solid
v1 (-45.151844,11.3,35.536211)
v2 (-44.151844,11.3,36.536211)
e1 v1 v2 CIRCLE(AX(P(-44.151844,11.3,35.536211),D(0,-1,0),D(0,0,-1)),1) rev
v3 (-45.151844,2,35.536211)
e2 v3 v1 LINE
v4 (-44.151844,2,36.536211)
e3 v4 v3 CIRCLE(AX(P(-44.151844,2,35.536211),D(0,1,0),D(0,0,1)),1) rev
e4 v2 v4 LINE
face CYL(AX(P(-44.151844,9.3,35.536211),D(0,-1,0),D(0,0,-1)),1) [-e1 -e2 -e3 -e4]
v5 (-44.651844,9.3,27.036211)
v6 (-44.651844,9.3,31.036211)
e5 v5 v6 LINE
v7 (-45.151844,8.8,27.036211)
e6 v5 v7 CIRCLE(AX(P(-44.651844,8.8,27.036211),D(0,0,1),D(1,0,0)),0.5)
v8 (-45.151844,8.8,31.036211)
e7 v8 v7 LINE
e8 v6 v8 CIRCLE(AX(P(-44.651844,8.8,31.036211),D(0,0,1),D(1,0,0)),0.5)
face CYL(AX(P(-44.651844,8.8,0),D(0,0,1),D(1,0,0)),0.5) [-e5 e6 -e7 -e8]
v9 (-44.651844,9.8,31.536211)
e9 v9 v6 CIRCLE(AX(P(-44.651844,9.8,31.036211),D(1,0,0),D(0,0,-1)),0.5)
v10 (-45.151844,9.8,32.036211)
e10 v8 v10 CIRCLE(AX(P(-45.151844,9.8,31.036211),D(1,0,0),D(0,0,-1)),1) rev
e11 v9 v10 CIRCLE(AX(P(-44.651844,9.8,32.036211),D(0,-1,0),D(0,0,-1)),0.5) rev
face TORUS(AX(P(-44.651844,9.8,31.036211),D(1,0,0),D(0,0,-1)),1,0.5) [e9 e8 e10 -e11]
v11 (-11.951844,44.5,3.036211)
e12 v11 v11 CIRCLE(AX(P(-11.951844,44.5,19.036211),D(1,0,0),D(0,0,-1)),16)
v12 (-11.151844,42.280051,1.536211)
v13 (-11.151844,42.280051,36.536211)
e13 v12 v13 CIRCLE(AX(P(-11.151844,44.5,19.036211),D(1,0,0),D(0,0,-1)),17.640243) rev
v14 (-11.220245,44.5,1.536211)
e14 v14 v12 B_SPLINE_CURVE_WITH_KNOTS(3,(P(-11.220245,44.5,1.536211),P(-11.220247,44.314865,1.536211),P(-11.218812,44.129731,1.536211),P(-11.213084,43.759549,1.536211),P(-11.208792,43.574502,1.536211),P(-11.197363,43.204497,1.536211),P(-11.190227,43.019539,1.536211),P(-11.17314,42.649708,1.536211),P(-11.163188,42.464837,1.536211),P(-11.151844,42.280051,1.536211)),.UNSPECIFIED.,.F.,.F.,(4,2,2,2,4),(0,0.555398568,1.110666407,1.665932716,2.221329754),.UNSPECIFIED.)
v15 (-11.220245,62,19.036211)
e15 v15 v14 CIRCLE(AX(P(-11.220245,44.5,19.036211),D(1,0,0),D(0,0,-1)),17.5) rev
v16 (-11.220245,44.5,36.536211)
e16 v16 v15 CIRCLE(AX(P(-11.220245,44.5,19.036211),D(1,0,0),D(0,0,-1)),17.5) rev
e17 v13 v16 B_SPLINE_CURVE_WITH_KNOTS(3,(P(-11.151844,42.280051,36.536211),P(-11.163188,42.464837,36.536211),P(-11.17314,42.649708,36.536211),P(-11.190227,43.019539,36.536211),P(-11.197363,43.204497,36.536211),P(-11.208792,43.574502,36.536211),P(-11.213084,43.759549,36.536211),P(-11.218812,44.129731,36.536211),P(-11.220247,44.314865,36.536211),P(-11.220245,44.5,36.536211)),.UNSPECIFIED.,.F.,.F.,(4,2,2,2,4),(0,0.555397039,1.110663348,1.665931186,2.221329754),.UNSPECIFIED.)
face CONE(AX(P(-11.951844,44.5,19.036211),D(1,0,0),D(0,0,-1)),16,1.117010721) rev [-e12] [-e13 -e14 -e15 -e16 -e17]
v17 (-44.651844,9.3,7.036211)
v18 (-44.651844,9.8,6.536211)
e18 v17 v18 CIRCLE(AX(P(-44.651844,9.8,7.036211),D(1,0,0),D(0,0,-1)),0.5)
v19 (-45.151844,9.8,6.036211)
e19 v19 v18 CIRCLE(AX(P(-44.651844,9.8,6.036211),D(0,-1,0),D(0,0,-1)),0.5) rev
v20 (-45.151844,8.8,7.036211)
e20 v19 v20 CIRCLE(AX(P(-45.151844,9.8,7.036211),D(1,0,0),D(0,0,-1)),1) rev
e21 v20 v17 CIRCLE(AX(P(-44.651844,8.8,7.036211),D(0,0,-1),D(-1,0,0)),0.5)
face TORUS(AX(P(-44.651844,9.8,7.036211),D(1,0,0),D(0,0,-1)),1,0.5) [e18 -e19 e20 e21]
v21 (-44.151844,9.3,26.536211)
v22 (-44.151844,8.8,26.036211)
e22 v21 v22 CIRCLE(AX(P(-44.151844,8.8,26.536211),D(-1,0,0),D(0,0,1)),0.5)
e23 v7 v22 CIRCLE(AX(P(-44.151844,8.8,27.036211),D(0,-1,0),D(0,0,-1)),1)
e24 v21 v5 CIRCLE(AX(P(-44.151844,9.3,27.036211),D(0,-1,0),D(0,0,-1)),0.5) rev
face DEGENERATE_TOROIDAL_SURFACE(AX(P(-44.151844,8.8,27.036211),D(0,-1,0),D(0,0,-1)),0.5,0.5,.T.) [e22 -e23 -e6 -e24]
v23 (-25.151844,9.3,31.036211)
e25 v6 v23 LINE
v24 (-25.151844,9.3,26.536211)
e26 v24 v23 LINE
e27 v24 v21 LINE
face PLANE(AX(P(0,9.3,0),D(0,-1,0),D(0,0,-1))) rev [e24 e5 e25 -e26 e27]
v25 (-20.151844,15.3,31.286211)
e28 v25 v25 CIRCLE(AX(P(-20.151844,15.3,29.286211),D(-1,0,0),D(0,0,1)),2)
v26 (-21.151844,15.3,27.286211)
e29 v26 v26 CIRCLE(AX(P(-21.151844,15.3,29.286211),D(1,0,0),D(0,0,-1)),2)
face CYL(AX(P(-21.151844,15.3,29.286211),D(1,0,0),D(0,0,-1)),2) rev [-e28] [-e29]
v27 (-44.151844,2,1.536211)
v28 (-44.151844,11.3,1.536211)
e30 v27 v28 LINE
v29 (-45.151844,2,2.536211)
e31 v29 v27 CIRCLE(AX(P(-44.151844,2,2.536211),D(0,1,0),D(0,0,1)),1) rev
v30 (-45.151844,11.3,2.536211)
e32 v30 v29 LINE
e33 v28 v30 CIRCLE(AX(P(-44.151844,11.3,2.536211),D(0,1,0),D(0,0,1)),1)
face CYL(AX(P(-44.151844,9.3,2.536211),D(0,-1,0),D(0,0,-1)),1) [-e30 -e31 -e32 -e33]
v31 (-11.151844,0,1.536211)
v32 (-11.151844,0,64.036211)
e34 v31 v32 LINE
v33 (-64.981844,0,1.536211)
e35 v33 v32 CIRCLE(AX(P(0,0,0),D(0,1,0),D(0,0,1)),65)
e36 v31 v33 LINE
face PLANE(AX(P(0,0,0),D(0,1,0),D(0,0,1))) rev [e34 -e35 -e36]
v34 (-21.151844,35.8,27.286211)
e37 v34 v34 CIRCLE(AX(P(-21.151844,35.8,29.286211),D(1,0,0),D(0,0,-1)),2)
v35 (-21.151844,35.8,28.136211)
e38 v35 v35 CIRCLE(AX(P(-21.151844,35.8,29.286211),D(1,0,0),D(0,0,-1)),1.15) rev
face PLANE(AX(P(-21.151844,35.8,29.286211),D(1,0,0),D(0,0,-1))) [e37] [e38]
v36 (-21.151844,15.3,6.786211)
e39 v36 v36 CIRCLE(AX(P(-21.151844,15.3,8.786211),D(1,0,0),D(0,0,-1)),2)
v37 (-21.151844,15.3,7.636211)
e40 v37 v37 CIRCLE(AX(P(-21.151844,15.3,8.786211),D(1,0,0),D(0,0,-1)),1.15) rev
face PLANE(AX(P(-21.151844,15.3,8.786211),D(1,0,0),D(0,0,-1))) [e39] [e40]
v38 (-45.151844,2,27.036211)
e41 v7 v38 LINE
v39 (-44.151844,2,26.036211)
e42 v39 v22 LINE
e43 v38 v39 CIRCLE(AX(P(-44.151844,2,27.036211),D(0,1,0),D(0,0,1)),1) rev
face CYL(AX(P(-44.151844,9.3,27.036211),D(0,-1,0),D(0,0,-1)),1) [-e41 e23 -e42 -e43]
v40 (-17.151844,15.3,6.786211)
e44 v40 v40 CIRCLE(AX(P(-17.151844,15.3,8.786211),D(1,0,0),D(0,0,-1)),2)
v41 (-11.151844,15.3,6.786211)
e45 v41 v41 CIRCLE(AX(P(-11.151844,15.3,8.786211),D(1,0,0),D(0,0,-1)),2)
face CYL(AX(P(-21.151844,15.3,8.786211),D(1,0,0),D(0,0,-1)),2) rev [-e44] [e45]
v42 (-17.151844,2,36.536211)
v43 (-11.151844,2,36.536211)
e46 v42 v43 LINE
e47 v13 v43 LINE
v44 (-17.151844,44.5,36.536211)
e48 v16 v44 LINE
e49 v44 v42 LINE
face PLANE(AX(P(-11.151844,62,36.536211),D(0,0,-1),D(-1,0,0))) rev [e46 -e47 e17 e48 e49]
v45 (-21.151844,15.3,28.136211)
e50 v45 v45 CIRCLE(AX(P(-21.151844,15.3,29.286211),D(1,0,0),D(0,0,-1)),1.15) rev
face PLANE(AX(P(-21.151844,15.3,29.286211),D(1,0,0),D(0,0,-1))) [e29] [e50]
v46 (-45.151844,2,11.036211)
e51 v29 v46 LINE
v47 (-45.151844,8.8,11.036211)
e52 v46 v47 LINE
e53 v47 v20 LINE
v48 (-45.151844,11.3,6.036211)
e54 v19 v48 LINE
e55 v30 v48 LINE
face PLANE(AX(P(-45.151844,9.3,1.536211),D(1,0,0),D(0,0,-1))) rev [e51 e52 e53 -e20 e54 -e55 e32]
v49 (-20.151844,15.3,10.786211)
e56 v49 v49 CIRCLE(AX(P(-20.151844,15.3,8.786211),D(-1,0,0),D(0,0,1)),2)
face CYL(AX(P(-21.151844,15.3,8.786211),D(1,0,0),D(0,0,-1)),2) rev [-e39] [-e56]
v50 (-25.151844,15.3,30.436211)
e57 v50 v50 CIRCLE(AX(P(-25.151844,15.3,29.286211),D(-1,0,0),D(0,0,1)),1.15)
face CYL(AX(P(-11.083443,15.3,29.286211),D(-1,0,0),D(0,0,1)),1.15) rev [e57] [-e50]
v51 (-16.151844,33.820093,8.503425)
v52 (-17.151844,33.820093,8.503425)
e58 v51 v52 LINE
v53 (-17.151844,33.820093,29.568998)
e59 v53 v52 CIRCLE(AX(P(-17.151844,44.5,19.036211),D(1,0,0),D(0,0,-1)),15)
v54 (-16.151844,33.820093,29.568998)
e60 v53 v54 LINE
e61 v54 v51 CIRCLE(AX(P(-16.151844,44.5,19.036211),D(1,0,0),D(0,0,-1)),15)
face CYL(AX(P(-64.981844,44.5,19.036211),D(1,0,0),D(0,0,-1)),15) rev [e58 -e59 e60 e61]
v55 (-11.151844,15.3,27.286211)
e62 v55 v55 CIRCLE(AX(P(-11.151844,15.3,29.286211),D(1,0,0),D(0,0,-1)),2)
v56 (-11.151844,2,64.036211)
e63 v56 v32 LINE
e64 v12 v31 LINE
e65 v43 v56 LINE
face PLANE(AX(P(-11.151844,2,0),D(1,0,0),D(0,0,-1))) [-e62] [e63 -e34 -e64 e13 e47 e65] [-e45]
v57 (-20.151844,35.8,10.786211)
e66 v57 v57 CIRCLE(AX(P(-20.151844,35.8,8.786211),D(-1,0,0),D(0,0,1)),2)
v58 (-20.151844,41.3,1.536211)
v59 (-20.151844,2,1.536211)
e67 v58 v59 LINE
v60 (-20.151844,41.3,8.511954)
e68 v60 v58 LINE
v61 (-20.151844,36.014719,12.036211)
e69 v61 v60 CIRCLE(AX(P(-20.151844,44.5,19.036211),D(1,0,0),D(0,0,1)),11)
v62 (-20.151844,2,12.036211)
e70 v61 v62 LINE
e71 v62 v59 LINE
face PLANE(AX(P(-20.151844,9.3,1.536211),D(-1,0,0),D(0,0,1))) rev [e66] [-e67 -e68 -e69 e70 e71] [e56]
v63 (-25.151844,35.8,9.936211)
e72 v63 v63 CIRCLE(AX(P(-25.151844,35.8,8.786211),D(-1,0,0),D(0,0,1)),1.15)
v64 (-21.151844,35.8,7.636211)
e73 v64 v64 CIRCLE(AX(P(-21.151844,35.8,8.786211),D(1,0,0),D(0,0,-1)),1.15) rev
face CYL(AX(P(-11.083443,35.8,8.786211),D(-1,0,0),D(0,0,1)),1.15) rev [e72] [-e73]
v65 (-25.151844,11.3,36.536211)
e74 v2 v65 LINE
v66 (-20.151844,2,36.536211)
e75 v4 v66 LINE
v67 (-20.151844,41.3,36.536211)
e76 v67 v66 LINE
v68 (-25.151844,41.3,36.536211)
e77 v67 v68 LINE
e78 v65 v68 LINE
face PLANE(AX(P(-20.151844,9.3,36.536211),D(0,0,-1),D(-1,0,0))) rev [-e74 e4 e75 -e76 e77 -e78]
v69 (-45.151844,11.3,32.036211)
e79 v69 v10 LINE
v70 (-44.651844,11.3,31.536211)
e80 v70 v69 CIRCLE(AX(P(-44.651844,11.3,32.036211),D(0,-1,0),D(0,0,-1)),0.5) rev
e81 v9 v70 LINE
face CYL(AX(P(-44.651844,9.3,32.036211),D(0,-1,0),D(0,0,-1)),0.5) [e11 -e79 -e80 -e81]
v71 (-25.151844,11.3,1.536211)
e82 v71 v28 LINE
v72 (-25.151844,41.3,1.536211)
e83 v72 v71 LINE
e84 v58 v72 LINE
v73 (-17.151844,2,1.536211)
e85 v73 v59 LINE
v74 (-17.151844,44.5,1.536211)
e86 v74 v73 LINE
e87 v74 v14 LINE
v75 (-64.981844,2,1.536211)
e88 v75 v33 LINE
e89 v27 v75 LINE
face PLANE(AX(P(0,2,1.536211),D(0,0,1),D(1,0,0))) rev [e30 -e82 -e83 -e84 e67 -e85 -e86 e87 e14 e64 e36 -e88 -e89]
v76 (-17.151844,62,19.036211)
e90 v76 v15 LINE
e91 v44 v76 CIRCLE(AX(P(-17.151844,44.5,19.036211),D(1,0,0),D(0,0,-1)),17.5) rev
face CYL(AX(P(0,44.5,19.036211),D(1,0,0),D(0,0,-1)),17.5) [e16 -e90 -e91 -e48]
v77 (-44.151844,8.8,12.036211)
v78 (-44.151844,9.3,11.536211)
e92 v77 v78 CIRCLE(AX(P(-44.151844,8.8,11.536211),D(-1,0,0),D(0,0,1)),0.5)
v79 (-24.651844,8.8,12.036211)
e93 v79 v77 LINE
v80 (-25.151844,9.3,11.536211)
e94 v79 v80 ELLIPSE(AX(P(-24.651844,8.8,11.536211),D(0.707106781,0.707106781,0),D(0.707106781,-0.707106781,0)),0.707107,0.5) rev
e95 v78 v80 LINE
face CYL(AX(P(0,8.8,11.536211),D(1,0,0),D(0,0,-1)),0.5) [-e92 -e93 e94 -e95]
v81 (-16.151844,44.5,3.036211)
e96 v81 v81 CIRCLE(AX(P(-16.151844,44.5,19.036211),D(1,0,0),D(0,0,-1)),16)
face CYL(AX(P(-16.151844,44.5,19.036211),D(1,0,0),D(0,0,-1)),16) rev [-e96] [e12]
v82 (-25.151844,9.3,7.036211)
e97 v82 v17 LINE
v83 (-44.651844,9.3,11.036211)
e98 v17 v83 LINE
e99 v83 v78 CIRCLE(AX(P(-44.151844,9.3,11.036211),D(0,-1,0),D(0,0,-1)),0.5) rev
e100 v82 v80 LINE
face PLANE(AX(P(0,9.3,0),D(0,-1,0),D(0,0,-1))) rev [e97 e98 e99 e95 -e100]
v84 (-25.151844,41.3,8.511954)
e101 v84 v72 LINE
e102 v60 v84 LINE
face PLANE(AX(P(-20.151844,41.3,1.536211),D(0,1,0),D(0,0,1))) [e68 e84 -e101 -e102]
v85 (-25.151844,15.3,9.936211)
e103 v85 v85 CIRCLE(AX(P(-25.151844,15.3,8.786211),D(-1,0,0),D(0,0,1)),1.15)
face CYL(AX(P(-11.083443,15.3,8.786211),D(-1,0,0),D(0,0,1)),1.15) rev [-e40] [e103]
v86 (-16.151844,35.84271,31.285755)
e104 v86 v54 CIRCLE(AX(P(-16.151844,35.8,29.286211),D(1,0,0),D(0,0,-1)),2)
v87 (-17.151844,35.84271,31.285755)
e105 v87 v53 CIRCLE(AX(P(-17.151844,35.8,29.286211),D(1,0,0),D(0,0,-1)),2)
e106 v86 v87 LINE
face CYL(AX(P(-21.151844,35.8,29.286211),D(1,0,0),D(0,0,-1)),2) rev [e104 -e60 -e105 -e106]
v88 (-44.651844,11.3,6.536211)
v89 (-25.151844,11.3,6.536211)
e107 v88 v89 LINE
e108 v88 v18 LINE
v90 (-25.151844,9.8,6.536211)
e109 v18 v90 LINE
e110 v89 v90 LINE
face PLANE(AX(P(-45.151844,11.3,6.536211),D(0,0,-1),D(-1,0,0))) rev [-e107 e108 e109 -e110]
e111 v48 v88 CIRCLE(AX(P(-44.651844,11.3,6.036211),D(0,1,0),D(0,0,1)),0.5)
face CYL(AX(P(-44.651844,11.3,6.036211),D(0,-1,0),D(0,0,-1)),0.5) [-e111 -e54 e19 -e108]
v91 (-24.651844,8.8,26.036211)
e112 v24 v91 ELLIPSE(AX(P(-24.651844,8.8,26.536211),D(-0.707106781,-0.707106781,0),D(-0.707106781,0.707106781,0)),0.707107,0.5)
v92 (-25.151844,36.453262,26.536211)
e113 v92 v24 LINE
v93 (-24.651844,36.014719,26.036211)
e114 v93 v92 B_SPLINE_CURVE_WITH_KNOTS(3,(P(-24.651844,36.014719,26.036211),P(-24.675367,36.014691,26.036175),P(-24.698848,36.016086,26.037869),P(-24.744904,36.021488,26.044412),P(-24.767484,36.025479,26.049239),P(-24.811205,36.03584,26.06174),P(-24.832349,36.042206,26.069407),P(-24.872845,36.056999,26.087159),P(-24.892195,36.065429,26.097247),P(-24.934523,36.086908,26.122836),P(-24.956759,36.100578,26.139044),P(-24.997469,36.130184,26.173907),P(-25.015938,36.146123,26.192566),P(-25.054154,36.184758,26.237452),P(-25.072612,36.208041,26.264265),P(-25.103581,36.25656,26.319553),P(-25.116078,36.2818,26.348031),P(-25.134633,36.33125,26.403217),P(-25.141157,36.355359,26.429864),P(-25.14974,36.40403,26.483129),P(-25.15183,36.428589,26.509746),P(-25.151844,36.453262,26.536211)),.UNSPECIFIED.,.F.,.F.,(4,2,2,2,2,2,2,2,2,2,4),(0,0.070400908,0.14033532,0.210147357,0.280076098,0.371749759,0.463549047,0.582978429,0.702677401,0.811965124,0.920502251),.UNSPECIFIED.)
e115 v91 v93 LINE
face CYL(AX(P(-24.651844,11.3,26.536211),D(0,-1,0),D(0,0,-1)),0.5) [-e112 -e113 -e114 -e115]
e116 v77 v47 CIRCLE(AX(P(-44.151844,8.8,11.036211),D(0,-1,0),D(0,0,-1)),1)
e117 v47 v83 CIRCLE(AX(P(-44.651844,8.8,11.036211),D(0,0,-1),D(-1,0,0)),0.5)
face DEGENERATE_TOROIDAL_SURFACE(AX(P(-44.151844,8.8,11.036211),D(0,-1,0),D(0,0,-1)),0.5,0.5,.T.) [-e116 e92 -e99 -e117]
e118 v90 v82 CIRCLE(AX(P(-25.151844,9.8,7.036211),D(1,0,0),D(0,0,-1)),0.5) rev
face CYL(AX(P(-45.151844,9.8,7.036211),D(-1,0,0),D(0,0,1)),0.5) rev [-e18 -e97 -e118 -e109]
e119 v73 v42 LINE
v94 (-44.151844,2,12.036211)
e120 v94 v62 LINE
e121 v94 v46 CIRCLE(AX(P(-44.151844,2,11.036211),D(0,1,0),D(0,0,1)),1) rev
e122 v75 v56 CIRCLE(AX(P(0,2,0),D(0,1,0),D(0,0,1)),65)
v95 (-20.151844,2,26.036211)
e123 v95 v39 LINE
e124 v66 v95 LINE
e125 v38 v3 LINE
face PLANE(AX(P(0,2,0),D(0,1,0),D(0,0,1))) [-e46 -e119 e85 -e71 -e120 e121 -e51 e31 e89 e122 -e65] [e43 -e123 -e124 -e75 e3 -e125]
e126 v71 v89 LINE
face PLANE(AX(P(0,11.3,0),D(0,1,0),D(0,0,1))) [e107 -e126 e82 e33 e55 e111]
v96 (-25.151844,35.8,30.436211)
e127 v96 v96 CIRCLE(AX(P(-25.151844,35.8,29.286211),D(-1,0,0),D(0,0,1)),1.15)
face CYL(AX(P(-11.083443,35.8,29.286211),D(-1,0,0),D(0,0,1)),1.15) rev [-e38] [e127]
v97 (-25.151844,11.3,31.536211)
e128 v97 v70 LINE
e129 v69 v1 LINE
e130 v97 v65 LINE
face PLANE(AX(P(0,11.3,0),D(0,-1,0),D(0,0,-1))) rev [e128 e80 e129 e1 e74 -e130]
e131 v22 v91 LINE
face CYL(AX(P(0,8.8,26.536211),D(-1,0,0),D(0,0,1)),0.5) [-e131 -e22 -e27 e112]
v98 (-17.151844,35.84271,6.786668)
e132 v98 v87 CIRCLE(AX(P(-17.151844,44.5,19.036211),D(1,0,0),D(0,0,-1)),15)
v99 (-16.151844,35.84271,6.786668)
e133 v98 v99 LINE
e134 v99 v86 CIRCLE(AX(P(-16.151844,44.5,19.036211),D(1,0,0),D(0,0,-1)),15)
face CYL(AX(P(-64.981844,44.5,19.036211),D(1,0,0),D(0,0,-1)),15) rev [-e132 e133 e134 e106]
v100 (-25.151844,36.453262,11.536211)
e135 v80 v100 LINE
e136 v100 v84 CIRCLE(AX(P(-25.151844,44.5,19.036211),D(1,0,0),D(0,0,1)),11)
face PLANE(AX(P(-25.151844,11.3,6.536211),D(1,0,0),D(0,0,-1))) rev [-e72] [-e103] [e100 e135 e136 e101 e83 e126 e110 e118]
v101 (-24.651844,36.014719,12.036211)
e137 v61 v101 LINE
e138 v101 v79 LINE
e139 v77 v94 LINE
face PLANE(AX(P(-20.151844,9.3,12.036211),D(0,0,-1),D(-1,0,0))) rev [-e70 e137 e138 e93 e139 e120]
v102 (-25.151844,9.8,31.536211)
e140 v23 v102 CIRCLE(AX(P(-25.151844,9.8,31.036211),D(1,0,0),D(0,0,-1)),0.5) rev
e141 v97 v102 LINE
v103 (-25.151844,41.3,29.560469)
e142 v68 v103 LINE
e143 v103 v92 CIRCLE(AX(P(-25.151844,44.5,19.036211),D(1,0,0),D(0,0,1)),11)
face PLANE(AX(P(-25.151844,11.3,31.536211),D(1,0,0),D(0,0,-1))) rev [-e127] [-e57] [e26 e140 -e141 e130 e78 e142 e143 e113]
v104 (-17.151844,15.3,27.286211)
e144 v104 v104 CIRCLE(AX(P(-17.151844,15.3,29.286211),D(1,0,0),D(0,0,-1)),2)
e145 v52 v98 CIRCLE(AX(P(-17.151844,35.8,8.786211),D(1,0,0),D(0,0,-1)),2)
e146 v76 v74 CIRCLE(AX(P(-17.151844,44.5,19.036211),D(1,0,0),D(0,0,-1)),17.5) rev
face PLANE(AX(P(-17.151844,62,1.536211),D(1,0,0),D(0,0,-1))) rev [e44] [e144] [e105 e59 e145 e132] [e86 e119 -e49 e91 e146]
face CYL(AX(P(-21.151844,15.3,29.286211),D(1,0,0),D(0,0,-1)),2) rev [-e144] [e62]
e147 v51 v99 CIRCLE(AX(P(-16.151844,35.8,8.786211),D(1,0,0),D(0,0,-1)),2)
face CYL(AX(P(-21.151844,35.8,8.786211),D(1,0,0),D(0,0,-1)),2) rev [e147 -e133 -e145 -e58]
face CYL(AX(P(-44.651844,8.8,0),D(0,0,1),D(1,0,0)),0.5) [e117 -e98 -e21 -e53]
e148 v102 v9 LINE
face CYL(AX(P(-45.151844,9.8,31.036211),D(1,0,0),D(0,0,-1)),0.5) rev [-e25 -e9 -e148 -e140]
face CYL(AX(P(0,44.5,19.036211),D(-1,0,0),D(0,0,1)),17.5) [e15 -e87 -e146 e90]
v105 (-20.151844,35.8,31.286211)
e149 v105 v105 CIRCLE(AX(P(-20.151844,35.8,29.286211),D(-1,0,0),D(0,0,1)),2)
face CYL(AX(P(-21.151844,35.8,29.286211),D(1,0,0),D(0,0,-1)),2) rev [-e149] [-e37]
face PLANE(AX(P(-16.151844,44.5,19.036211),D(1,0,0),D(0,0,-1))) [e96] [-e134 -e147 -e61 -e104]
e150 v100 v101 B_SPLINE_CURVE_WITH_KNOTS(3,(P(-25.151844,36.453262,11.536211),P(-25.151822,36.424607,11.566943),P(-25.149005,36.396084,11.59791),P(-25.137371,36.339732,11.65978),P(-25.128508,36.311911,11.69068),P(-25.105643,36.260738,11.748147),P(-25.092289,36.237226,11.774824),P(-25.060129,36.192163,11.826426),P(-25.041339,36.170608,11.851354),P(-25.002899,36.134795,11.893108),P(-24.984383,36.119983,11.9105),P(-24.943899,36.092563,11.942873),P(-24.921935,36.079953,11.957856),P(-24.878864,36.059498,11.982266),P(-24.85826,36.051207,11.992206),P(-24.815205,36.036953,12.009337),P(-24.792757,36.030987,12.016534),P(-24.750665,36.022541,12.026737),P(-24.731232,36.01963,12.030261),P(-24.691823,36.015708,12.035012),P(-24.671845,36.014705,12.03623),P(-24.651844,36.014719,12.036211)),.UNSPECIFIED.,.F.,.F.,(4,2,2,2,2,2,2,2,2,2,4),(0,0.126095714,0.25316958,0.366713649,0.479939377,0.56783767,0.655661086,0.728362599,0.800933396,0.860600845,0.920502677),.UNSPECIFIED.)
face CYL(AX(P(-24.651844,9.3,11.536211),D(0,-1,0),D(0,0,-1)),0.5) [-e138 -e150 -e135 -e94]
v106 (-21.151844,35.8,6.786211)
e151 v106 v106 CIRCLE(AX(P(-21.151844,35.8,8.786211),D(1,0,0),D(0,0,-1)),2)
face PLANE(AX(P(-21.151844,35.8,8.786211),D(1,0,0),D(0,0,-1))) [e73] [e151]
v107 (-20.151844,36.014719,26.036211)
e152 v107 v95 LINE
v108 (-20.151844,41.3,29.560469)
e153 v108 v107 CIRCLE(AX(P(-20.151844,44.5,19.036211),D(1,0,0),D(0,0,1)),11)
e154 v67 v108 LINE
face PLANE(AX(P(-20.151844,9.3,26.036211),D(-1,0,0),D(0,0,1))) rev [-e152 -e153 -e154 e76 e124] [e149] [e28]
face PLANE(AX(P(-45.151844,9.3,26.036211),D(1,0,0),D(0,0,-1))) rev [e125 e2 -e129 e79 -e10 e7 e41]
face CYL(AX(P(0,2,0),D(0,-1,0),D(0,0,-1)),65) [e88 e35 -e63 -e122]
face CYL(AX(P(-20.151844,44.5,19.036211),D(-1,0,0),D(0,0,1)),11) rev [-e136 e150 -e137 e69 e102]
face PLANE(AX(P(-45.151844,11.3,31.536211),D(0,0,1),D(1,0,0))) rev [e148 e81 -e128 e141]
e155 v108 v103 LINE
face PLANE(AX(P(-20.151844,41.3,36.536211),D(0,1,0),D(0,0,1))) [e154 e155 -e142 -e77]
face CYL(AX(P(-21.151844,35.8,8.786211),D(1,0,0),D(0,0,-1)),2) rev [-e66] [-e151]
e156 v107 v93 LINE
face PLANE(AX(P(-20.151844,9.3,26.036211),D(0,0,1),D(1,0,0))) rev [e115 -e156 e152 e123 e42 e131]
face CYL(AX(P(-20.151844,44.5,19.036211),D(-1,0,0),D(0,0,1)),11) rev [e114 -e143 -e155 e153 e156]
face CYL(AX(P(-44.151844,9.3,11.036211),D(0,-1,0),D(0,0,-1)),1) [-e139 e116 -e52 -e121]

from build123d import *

# Parameters (mm, degrees)
EXTRUDE_1_DEPTH     = 2
SKETCH_2_W          = 6
SKETCH_2_H          = 35
EXTRUDE_2_DEPTH     = 60
FILLET_1_R          = 17.5
SKETCH_3_R          = 16
CUT_EXTRUDE_1_DEPTH = 5
CHAMFER_1_SIZE      = 1.640243073
CHAMFER_1_SIZE_2    = 0.8
SKETCH_4_R          = 15
CUT_EXTRUDE_2_DEPTH = 102.631713982
SKETCH_5_W          = 25
SKETCH_5_H          = 10.5
EXTRUDE_3_DEPTH     = 7.3
EXTRUDE_4_DEPTH     = 2
FILLET_2_R          = 1
EXTRUDE_5_DEPTH     = 5
SKETCH_9_R          = 1.15
CUT_EXTRUDE_3_DEPTH = 98.627174941
SKETCH_10_R         = 2
CUT_EXTRUDE_4_DEPTH = 10
FILLET_3_R          = 0.5


# Some blends are built 0.0001 mm under size
with BuildPart() as part:
    # 스케치1 → 보스-돌출1 (new body)
    with BuildSketch(Plane(origin=(0, 0, 0), x_dir=(1, 0, 0), z_dir=(0, 1, 0))):
        with BuildLine():
            Line((-11.151844037, -1.536211432), (-64.981844037, -1.536211432))
            ThreePointArc((-64.981844037, -1.536211432), (-49.250859027, -42.418779863), (-11.151844037, -64.036211432))
            Line((-11.151844037, -64.036211432), (-11.151844037, -1.536211432))
        make_face()
    extrude(amount=EXTRUDE_1_DEPTH)

    # 스케치2 → 보스-돌출2 (add)
    with BuildSketch(Plane(origin=(0, 2, 0), x_dir=(1, 0, 0), z_dir=(0, 1, 0))):
        with Locations((-14.151844037, -19.036211432)):
            Rectangle(SKETCH_2_W, SKETCH_2_H)
    extrude(amount=EXTRUDE_2_DEPTH)

    # 필렛1
    fillet_1_edges = [part.edges().sort_by_distance(p)[0] for p in [
        (-14.151844037, 62, 1.536211432),
        (-14.151844037, 62, 36.536211432),
    ]]
    fillet(fillet_1_edges, radius=FILLET_1_R - 0.0001)  # a hair under: the kernel refuses the full size

    # 스케치3 → 컷-돌출1 (cut)
    with BuildSketch(Plane(origin=(-11.151844037, 0, 0), x_dir=(0, 0, -1), z_dir=(1, 0, 0))):
        with Locations((-19.036211432, 44.5)):
            Circle(SKETCH_3_R)
    extrude(amount=-CUT_EXTRUDE_1_DEPTH, mode=Mode.SUBTRACT)

    # 모따기1
    # the kernel refuses this chamfer: 1.640243073, 0.8 mm, written as the material it takes off along each edge
    with BuildSketch(Plane(origin=(-11.151844037, 44.5, 19.036211432), x_dir=(0, 0, -1), z_dir=(0, -1, 0))) as chamfer_1_piece_1:
        Polygon((16 + CHAMFER_1_SIZE, 0), (16, -CHAMFER_1_SIZE_2), (16, 0), align=None)
    revolve(axis=Axis((-11.151844037, 44.5, 19.036211432), (1, 0, 0)), mode=Mode.SUBTRACT)

    # 스케치4 → 컷-돌출2 (cut, through all)
    with BuildSketch(Plane(origin=(-16.151844037, 0, 0), x_dir=(0, 0, -1), z_dir=(1, 0, 0))):
        with Locations((-19.036211432, 44.5)):
            Circle(SKETCH_4_R)
    extrude(amount=-CUT_EXTRUDE_2_DEPTH, mode=Mode.SUBTRACT)

    # 스케치5 → 보스-돌출3 (add)
    with BuildSketch(Plane(origin=(0, 2, 0), x_dir=(1, 0, 0), z_dir=(0, 1, 0))):
        with Locations((-32.651844037, -6.786211432)):
            Rectangle(SKETCH_5_W, SKETCH_5_H)
        with Locations((-32.651844037, -31.286211432)):
            Rectangle(SKETCH_5_W, SKETCH_5_H)
    extrude(amount=EXTRUDE_3_DEPTH)

    # 스케치6 → 보스-돌출4 (add)
    with BuildSketch(Plane(origin=(0, 9.3, 0), x_dir=(1, 0, 0), z_dir=(0, 1, 0))):
        Polygon((-45.151844037, -31.536211432), (-25.151844037, -31.536211432), (-25.151844037, -26.036211432), (-20.151844037, -26.036211432), (-20.151844037, -36.536211432), (-45.151844037, -36.536211432), align=None)
        Polygon((-45.151844037, -1.536211432), (-20.151844037, -1.536211432), (-20.151844037, -12.036211432), (-25.151844037, -12.036211432), (-25.151844037, -6.536211432), (-45.151844037, -6.536211432), align=None)
    extrude(amount=EXTRUDE_4_DEPTH)

    # 필렛2
    fillet_2_edges = [part.edges().sort_by_distance(p)[0] for p in [
        (-45.151844037, 6.65, 1.536211432),
        (-45.151844037, 5.65, 12.036211432),
        (-45.151844037, 5.65, 26.036211432),
        (-45.151844037, 6.65, 36.536211432),
    ]]
    fillet(fillet_2_edges, radius=FILLET_2_R)

    # 스케치7 → 보스-돌출5 (add)
    with BuildSketch(Plane.ZY.offset(25.151844037)):
        with BuildLine():
            Line((1.536211432, 11.3), (12.036211432, 11.3))
            Line((12.036211432, 11.3), (12.036211432, 36.014718626))
            ThreePointArc((12.036211432, 36.014718626), (9.884247068, 38.397414624), (8.511953739, 41.3))
            Line((8.511953739, 41.3), (1.536211432, 41.3))
            Line((1.536211432, 41.3), (1.536211432, 11.3))
        make_face()
        with BuildLine():
            Line((36.536211432, 11.3), (26.036211432, 11.3))
            Line((26.036211432, 11.3), (26.036211432, 36.014718626))
            ThreePointArc((26.036211432, 36.014718626), (28.188175797, 38.397414624), (29.560469126, 41.3))
            Line((29.560469126, 41.3), (36.536211432, 41.3))
            Line((36.536211432, 41.3), (36.536211432, 11.3))
        make_face()
    extrude(amount=-EXTRUDE_5_DEPTH)

    # 스케치9 → 컷-돌출3 (cut, through all)
    with BuildSketch(Plane.ZY.offset(25.151844037)):
        with Locations((8.786211432, 35.8)):
            Circle(SKETCH_9_R)
        with Locations((8.786211432, 15.3)):
            Circle(SKETCH_9_R)
        with Locations((29.286211432, 15.3)):
            Circle(SKETCH_9_R)
        with Locations((29.286211432, 35.8)):
            Circle(SKETCH_9_R)
    extrude(amount=-CUT_EXTRUDE_3_DEPTH, mode=Mode.SUBTRACT)

    # 스케치10 → 컷-돌출4 (cut)
    with BuildSketch(Plane(origin=(-11.151844037, 0, 0), x_dir=(0, 0, -1), z_dir=(1, 0, 0))):
        with Locations((-29.286211432, 15.3)):
            Circle(SKETCH_10_R)
        with Locations((-8.786211432, 15.3)):
            Circle(SKETCH_10_R)
        with Locations((-8.786211432, 35.8)):
            Circle(SKETCH_10_R)
        with Locations((-29.286211432, 35.8)):
            Circle(SKETCH_10_R)
    extrude(amount=-CUT_EXTRUDE_4_DEPTH, mode=Mode.SUBTRACT)

    # 필렛3
    fillet_3_edges = [part.edges().sort_by_distance(p)[0] for p in [
        (-45.151844037, 10.3, 31.536211432),
        (-25.151844037, 22.657359313, 26.036211432),
        (-35.151844037, 9.3, 31.536211432),
        (-45.151844037, 9.3, 29.286211432),
        (-44.858950818, 9.3, 26.329104651),
        (-34.651844037, 9.3, 12.036211432),
        (-44.858950818, 9.3, 11.743318213),
        (-45.151844037, 9.3, 8.786211432),
        (-35.151844037, 9.3, 6.536211432),
        (-45.151844037, 10.3, 6.536211432),
        (-25.151844037, 22.657359313, 12.036211432),
        (-34.651844037, 9.3, 26.036211432),
    ]]
    fillet(fillet_3_edges, radius=FILLET_3_R)


solid = part.part
